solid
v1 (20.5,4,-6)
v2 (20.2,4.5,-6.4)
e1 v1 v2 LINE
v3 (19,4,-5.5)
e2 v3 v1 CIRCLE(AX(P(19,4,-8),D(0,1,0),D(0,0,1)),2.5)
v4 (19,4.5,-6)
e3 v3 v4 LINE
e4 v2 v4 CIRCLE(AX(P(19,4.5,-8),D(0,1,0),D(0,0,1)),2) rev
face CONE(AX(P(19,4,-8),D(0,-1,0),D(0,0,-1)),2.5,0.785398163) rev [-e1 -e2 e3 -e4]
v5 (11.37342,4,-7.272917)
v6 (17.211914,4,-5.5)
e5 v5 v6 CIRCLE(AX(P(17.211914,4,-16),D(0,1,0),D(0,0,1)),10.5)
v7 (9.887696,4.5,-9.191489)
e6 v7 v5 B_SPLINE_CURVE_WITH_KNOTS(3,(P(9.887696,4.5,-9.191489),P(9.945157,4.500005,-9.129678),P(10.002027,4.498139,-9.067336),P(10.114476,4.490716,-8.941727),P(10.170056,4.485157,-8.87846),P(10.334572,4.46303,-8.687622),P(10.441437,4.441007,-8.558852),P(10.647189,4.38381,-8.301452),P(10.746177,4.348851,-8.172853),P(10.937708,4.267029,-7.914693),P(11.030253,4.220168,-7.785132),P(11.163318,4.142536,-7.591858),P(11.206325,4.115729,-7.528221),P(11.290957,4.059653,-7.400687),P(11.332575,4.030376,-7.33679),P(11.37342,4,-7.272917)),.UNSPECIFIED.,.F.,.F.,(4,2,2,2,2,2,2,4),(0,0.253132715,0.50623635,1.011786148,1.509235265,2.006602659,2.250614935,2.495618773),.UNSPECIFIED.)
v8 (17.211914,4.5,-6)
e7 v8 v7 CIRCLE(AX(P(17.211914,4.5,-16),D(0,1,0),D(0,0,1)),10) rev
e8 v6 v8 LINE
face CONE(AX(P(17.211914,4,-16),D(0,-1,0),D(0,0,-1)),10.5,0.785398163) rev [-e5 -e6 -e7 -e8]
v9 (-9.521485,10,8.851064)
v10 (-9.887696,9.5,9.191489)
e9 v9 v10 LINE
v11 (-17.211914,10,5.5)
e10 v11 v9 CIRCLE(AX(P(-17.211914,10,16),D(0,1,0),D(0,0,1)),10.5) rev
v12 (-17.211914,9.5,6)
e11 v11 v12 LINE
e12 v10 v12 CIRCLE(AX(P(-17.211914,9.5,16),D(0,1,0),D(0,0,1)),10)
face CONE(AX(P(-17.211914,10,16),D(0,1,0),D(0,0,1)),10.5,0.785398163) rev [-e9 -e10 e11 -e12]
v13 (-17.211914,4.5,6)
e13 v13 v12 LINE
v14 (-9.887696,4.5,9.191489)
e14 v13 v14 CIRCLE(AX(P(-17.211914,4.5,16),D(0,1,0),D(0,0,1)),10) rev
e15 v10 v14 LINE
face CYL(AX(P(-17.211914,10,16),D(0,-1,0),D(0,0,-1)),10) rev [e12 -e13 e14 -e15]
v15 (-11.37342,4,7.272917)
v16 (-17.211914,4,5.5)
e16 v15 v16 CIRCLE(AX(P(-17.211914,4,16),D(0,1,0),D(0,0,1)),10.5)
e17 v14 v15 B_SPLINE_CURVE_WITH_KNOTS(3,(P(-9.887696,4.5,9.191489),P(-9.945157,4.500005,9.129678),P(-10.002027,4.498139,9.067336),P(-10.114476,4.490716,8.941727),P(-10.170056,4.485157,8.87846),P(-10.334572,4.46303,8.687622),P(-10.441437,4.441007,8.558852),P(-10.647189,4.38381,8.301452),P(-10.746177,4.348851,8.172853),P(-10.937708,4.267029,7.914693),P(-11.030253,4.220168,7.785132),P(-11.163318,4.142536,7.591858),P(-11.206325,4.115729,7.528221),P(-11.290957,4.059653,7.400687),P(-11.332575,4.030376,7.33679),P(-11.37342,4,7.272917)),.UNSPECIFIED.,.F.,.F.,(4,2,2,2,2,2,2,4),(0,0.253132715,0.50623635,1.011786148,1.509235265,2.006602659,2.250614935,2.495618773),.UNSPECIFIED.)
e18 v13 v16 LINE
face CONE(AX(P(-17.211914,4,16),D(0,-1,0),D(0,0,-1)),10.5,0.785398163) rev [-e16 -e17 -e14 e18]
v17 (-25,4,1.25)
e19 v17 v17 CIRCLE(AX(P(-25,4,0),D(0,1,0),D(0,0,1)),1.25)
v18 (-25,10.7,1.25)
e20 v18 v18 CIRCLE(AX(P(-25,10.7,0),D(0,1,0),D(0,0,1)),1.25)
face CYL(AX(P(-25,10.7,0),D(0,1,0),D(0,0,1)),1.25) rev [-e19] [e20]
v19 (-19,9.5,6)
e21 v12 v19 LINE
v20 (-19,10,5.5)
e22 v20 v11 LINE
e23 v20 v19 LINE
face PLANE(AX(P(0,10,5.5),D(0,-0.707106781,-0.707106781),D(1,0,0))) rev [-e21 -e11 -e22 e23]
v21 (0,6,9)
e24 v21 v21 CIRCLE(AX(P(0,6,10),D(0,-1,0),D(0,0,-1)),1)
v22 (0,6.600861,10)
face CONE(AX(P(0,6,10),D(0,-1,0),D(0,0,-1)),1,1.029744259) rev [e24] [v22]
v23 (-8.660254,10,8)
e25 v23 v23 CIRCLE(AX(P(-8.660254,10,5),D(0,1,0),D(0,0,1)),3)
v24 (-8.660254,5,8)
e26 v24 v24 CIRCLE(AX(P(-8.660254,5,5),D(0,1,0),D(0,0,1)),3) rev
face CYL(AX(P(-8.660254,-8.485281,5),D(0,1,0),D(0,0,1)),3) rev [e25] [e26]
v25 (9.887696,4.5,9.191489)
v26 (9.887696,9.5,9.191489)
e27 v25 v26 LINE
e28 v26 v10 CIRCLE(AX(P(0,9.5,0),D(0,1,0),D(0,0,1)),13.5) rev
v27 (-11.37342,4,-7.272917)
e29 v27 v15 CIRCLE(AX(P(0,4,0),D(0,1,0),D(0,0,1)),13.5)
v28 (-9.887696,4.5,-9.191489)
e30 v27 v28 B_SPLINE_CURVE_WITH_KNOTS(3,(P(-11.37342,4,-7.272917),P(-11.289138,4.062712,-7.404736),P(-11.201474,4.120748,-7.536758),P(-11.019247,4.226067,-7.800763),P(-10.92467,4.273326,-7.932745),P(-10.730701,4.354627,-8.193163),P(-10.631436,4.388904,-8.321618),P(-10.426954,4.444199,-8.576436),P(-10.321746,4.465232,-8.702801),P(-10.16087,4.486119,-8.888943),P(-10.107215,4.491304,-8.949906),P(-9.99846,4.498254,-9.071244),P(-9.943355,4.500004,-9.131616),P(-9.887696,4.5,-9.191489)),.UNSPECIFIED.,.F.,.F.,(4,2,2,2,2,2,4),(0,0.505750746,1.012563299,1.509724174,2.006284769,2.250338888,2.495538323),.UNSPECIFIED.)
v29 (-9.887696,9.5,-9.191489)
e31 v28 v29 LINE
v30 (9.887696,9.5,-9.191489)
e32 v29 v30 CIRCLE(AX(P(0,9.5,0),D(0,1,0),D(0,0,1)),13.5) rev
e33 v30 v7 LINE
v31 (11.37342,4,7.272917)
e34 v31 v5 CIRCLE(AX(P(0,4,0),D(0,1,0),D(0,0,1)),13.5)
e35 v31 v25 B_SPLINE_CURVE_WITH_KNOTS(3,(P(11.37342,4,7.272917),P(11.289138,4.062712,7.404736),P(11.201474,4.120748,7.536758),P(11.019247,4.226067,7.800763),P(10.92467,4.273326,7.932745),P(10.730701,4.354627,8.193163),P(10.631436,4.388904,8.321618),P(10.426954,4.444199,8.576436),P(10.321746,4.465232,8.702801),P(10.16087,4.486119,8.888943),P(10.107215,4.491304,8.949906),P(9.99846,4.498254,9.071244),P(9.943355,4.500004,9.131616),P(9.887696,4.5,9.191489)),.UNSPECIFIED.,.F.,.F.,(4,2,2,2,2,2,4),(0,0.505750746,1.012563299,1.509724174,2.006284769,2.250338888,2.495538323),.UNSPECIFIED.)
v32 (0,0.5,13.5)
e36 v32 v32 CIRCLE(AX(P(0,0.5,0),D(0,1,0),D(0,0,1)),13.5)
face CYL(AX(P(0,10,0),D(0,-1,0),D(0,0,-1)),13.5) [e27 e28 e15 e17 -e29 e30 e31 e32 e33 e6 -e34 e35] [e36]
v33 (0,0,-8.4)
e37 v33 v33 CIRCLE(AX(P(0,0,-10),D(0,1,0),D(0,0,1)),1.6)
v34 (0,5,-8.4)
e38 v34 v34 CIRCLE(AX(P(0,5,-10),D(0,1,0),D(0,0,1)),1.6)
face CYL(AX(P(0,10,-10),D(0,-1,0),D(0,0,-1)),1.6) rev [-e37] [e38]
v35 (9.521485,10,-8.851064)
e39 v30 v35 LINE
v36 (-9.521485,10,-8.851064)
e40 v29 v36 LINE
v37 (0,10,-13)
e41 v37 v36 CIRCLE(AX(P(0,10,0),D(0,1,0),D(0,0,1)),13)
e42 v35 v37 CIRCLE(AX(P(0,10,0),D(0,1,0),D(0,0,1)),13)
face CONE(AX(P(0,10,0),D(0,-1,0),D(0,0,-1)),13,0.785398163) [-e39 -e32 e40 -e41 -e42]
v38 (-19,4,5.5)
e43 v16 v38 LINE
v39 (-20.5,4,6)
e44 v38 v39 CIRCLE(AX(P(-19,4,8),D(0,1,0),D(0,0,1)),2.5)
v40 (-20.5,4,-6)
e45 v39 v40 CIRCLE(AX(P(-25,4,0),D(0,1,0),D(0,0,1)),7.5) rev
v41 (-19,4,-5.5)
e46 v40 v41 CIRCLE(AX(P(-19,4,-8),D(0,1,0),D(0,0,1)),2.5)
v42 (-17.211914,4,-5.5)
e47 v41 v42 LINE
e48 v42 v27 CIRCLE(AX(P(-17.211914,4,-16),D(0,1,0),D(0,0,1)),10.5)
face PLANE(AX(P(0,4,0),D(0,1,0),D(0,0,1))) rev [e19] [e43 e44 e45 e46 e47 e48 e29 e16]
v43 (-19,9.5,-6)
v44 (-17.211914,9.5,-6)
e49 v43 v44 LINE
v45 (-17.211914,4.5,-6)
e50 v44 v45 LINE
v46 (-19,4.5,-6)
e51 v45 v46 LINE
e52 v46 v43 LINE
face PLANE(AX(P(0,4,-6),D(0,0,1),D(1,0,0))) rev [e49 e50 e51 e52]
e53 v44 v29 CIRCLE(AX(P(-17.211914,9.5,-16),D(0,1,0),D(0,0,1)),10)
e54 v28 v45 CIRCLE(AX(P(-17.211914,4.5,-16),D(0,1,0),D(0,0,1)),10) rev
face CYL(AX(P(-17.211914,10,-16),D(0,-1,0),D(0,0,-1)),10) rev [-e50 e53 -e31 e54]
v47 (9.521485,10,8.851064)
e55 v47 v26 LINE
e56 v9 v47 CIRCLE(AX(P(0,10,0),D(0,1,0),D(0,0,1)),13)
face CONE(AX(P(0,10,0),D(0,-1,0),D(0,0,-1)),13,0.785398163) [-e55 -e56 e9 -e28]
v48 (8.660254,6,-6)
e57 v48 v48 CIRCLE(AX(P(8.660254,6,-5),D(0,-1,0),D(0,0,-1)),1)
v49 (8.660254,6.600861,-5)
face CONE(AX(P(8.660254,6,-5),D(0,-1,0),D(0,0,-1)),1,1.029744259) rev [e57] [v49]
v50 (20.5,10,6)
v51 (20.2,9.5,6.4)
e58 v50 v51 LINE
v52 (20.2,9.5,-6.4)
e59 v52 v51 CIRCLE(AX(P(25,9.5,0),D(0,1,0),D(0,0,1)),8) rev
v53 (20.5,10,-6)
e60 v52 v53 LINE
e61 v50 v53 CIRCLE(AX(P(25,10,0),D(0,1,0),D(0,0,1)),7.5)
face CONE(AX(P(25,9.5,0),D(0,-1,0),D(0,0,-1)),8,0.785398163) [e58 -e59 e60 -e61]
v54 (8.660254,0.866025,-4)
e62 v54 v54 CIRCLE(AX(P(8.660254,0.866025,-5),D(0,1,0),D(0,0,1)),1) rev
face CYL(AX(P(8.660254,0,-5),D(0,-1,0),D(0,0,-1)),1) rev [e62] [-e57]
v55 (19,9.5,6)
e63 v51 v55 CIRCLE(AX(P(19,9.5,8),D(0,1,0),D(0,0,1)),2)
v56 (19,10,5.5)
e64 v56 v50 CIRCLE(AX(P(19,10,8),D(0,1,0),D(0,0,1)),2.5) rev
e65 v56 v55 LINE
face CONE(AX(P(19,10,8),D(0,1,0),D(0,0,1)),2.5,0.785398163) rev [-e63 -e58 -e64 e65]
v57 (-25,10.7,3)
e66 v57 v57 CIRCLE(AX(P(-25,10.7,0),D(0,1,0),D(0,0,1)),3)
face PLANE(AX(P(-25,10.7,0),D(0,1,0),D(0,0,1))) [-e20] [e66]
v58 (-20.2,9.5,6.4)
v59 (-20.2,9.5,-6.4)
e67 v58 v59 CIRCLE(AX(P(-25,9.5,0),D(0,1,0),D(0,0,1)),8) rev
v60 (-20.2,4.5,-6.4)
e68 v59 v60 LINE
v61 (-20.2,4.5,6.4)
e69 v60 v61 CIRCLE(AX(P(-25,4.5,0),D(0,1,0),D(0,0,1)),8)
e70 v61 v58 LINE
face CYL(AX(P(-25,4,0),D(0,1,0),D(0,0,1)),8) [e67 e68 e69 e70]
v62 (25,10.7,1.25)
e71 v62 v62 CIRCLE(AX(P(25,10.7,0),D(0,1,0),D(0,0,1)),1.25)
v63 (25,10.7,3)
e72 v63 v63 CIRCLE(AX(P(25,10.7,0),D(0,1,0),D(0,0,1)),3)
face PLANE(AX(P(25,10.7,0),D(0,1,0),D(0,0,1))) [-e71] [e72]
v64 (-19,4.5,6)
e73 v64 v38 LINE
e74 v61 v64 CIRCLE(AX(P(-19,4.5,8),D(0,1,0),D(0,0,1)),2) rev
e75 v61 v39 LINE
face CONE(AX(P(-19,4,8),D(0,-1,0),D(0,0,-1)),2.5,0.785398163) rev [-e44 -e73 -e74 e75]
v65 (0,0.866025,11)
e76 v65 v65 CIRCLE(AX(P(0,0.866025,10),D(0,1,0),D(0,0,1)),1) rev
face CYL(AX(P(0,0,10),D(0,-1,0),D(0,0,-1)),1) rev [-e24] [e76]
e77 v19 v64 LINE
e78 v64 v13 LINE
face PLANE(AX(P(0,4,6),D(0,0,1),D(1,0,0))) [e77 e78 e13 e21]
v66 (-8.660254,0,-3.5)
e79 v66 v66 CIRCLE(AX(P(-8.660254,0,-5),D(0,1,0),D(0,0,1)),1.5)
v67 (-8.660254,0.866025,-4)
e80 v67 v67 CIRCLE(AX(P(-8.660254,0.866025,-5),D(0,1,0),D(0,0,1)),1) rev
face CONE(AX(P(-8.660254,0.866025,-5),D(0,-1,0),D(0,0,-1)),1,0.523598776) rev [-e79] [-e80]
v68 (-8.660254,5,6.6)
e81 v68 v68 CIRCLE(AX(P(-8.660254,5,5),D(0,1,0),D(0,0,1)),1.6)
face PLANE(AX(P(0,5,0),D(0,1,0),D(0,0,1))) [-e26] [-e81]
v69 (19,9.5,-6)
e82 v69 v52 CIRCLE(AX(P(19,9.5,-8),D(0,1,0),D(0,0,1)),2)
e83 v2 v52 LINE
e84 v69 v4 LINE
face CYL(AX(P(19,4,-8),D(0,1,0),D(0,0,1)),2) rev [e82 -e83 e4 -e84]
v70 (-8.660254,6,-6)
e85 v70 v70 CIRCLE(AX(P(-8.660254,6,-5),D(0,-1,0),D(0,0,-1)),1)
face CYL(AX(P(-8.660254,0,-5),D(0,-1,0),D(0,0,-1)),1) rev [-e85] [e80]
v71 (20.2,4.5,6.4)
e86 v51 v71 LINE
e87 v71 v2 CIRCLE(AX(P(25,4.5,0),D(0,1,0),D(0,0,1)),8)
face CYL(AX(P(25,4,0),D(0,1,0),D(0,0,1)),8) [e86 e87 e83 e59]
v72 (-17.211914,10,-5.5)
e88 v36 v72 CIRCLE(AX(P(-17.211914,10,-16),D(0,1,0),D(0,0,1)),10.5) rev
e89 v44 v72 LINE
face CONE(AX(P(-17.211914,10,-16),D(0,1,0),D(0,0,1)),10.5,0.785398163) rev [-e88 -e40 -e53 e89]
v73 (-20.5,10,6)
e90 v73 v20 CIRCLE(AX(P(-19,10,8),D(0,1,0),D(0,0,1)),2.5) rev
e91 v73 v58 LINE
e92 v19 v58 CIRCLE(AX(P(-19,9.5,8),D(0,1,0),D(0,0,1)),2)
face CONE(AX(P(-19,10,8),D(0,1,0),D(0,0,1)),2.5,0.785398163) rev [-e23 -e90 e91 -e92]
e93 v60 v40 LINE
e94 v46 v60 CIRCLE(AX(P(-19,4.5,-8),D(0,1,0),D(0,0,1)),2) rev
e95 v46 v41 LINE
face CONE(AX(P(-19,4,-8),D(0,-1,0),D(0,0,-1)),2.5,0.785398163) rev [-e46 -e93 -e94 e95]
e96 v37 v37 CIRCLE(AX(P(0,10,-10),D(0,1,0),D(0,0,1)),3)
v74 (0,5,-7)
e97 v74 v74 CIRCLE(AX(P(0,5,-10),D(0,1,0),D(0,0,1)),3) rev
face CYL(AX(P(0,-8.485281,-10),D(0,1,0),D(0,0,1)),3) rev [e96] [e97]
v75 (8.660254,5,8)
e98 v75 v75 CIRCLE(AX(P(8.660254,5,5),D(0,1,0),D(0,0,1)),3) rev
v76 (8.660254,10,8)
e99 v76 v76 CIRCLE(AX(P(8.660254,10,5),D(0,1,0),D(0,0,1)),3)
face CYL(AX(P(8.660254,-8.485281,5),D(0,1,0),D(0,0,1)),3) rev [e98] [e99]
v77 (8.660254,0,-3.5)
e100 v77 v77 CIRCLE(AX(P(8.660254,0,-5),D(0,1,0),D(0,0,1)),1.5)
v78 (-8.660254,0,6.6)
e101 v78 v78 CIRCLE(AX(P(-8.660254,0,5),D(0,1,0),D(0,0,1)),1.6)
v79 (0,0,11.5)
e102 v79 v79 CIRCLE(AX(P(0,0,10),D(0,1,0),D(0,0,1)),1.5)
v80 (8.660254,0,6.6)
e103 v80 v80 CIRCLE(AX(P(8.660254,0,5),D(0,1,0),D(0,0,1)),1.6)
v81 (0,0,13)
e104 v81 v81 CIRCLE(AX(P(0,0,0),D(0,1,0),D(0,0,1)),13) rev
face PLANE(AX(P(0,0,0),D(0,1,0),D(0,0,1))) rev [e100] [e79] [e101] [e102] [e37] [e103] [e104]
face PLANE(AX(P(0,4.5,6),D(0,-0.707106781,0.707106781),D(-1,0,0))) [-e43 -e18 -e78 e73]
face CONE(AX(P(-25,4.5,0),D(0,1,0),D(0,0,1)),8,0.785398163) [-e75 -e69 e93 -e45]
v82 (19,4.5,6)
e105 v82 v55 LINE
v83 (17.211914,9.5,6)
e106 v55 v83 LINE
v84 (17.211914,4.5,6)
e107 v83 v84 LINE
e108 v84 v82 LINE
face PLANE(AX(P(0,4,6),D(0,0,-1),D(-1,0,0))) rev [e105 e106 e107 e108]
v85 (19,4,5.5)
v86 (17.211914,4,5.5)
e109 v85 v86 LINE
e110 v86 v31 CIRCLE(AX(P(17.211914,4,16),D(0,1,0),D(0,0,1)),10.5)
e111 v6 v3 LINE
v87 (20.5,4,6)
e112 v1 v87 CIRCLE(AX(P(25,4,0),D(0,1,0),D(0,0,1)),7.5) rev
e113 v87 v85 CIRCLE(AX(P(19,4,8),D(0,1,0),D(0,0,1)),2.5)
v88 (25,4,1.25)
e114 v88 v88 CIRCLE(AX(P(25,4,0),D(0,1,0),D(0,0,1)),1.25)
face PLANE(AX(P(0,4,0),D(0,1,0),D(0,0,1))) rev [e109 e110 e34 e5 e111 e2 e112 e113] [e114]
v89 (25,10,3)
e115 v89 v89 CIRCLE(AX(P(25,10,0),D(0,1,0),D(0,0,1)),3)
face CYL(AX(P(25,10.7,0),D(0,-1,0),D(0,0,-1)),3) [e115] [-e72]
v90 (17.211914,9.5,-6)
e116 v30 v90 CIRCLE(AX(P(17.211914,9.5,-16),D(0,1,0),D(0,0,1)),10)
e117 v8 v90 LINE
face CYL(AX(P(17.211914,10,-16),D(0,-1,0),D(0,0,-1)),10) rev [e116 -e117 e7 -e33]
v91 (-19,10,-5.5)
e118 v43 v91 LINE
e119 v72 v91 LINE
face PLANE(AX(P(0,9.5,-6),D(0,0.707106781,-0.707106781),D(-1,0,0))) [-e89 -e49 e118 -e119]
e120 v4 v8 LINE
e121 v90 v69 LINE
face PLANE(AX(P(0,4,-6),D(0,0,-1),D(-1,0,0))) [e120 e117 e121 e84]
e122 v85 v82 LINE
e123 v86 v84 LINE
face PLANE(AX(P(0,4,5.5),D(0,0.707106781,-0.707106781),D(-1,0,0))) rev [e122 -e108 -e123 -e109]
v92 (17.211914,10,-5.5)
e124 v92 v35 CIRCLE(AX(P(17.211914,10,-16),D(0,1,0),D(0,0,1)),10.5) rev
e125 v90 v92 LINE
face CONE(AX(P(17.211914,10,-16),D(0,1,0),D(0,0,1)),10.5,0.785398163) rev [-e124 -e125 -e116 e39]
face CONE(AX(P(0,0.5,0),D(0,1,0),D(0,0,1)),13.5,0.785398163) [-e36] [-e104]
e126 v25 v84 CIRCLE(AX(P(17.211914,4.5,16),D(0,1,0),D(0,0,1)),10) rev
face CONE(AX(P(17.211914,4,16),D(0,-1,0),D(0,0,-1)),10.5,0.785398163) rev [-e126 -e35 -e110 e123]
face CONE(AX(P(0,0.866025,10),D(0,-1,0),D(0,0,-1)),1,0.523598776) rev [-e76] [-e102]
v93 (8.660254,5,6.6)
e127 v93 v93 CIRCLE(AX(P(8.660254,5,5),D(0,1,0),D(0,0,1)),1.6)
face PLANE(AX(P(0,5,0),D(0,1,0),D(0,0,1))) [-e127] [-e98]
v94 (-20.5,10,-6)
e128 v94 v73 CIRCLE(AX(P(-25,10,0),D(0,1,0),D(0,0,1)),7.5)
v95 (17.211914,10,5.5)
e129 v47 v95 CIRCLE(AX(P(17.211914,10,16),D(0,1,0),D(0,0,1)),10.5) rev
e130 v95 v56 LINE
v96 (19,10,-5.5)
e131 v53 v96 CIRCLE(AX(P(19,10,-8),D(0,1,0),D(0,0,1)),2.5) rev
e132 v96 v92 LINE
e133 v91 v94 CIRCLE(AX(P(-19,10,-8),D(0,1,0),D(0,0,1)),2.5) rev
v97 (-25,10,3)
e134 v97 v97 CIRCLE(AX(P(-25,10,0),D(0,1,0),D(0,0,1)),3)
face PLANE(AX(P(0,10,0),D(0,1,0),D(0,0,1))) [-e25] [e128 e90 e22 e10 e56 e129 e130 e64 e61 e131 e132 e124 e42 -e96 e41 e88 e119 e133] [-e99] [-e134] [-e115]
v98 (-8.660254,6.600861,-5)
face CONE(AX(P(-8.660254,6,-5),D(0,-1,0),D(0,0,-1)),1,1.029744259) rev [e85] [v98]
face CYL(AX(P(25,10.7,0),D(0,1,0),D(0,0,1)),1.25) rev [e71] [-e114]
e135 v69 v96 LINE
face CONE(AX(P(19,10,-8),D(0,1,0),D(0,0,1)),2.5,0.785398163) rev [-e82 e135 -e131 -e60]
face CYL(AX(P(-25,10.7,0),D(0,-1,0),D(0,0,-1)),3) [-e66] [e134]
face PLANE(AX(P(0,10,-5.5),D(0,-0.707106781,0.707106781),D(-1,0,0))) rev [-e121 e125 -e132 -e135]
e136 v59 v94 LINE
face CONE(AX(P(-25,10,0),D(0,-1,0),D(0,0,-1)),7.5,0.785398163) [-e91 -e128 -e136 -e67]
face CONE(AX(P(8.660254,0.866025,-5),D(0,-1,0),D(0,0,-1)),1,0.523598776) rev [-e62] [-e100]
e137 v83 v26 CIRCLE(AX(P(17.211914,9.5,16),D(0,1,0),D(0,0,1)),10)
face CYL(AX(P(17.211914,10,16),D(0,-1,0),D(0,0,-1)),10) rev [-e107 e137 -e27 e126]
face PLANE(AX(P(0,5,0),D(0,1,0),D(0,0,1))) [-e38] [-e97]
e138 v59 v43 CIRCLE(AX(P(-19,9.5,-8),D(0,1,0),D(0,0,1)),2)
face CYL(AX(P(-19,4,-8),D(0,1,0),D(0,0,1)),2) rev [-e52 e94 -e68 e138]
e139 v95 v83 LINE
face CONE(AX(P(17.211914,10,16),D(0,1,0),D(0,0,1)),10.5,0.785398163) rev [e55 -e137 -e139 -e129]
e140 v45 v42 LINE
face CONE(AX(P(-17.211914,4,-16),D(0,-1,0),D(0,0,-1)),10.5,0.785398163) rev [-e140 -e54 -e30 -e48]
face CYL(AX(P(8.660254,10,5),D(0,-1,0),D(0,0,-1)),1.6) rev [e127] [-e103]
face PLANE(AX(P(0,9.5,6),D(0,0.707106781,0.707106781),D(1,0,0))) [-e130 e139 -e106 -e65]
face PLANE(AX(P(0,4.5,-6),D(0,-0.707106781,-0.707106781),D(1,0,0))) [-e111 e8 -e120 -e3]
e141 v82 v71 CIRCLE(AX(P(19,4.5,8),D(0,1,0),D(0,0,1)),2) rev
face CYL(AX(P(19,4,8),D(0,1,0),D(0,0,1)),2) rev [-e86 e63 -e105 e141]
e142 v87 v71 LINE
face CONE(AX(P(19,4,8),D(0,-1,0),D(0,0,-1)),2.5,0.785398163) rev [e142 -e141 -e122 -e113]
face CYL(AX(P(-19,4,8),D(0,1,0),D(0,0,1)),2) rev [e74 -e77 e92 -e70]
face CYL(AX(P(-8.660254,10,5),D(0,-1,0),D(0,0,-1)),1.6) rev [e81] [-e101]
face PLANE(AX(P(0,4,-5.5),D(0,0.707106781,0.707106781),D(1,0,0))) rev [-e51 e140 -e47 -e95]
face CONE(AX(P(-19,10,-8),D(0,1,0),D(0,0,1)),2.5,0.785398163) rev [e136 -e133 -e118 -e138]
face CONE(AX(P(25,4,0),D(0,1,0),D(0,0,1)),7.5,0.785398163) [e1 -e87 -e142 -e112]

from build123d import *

# Parameters (mm, degrees)
SKETCH_1_R          = 13.5
SKETCH_1_R_2        = 1.6
EXTRUDE_1_DEPTH     = 10
EXTRUDE_START       = -6
SKETCH_2_R          = 1
EXTRUDE_2_DEPTH     = 6
SKETCH_3_R          = 3
CUT_EXTRUDE_1_DEPTH = 5
SKETCH_4_R          = 3
SKETCH_4_R_2        = 1
EXTRUDE_3_DEPTH     = 0.7
FILLET_1_R          = 10
FILLET_2_R          = 2
HOLE_WIZARD_M3_1_D  = 2.5
F_2_0MM_2_D         = 2
F_2_0MM_2_DEPTH     = 6
F_2_0MM_2_TIP       = 0.600860619
CHAMFER_1_SIZE      = 0.5
CHAMFER_2_SIZE      = 0.5
CHAMFER_2_SIZE2     = 0.866025404


with BuildPart() as part:
    # 草图1 → 凸台-拉伸1 (new body)
    with BuildSketch(Plane(origin=(0, 0, 0), x_dir=(1, 0, 0), z_dir=(0, 1, 0))):
        with Locations(Location((0, 0, 0), (0, 0, 270))):
            Circle(SKETCH_1_R)
        with Locations(Location((0, 10, 0), (0, 0, 270))):
            Circle(SKETCH_1_R_2, mode=Mode.SUBTRACT)
        with Locations(Location((8.660254038, -5, 0), (0, 0, 270))):
            Circle(SKETCH_1_R_2, mode=Mode.SUBTRACT)
        with Locations(Location((-8.660254038, -5, 0), (0, 0, 270))):
            Circle(SKETCH_1_R_2, mode=Mode.SUBTRACT)
    extrude(amount=EXTRUDE_1_DEPTH)

    # 草图2 → 凸台-拉伸2 (add)
    # profile 1 of 2: a face of its own
    with BuildSketch(Plane(origin=(0, 10, 0), x_dir=(1, 0, 0), z_dir=(0, 1, 0)).offset(EXTRUDE_START)):
        with BuildLine():
            Line((-12.093386622, 6), (-19.708497378, 6))
            ThreePointArc((-19.708497378, 6), (-33, 0), (-19.708497378, -6))
            Line((-19.708497378, -6), (-12.093386622, -6))
            ThreePointArc((-12.093386622, -6), (-13.5, 0), (-12.093386622, 6))
        make_face()
        with Locations(Location((-25, 0, 0), (0, 0, 270))):
            Circle(SKETCH_2_R, mode=Mode.SUBTRACT)
    # profile 2 of 2: a face of its own
    with BuildSketch(Plane(origin=(0, 10, 0), x_dir=(1, 0, 0), z_dir=(0, 1, 0)).offset(EXTRUDE_START)):
        with BuildLine():
            ThreePointArc((13.5, 0), (13.143643319, -3.08133742), (12.093386622, -6))
            Line((12.093386622, -6), (19.708497378, -6))
            ThreePointArc((19.708497378, -6), (33, 0), (19.708497378, 6))
            Line((19.708497378, 6), (12.093386622, 6))
            ThreePointArc((12.093386622, 6), (13.143643319, 3.08133742), (13.5, 0))
        make_face()
        with Locations(Location((25, 0, 0), (0, 0, 270))):
            Circle(SKETCH_2_R, mode=Mode.SUBTRACT)
    extrude(amount=EXTRUDE_2_DEPTH)

    # 草图3 → 切除-拉伸1 (cut)
    with BuildSketch(Plane(origin=(0, 10, 0), x_dir=(1, 0, 0), z_dir=(0, 1, 0))):
        with Locations(Location((0, 10, 0), (0, 0, 270))):
            Circle(SKETCH_3_R)
        with Locations(Location((8.660254038, -5, 0), (0, 0, 270))):
            Circle(SKETCH_3_R)
        with Locations(Location((-8.660254038, -5, 0), (0, 0, 270))):
            Circle(SKETCH_3_R)
    extrude(amount=-CUT_EXTRUDE_1_DEPTH, mode=Mode.SUBTRACT)

    # 草图4 → 凸台-拉伸3 (add)
    # profile 1 of 2: a face of its own
    with BuildSketch(Plane(origin=(0, 10, 0), x_dir=(1, 0, 0), z_dir=(0, 1, 0))):
        with Locations(Location((-25, 0, 0), (0, 0, 270))):
            Circle(SKETCH_4_R)
        with Locations(Location((-25, 0, 0), (0, 0, 270))):
            Circle(SKETCH_4_R_2, mode=Mode.SUBTRACT)
    # profile 2 of 2: a face of its own
    with BuildSketch(Plane(origin=(0, 10, 0), x_dir=(1, 0, 0), z_dir=(0, 1, 0))):
        with Locations(Location((25, 0, 0), (0, 0, 270))):
            Circle(SKETCH_4_R)
        with Locations(Location((25, 0, 0), (0, 0, 270))):
            Circle(SKETCH_4_R_2, mode=Mode.SUBTRACT)
    extrude(amount=EXTRUDE_3_DEPTH)

    # 圆角1
    fillet_1_edges = [part.edges().sort_by_distance(p)[0] for p in [
        (-12.093386622, 7, -6),
        (-12.093386622, 7, 6),
        (12.093386622, 7, 6),
        (12.093386622, 7, -6),
    ]]
    fillet(fillet_1_edges, radius=FILLET_1_R)

    # 圆角2
    fillet_2_edges = [part.edges().sort_by_distance(p)[0] for p in [
        (-19.708497378, 7, -6),
        (-19.708497378, 7, 6),
        (19.708497378, 7, -6),
        (19.708497378, 7, 6),
    ]]
    fillet(fillet_2_edges, radius=FILLET_2_R)

    # M3 螺纹孔1 (through all)
    with Locations(Plane(origin=(0, 10.7, 0), x_dir=(1, 0, 0), z_dir=(0, 1, 0))):
        with Locations((-25, 0), (25, 0)):
            Hole(HOLE_WIZARD_M3_1_D / 2)

    # Ø2.0mm 暗销孔2
    with Locations(Plane.XZ):
        with Locations((-8.660254038, -5), (0, 10), (8.660254038, -5)):
            Hole(F_2_0MM_2_D / 2, depth=F_2_0MM_2_DEPTH)
            with Locations((0, 0, -(F_2_0MM_2_DEPTH + F_2_0MM_2_TIP / 2))):  # 118° drill point
                Cone(0, F_2_0MM_2_D / 2, F_2_0MM_2_TIP, mode=Mode.SUBTRACT)

    # 倒角1
    # the kernel refuses this chamfer: 0.5 mm, written as the material it takes off along each edge
    with BuildSketch(Plane(origin=(25, 10, 0), x_dir=(-0.5999999999999984, 0, 0.8000000000000012), z_dir=(-0.8000000000000012, 0, -0.5999999999999984))) as chamfer_1_piece_1:
        Polygon((8 - CHAMFER_1_SIZE, 0), (8, -CHAMFER_1_SIZE), (8, 0), align=None)
    revolve(axis=Axis((25, 10, 0), (0, 1, 0)), revolution_arc=253.739795292, mode=Mode.SUBTRACT)
    with BuildSketch(Plane(origin=(25, 4, 0), x_dir=(-0.5999999999999984, 0, 0.8000000000000012), z_dir=(-0.8000000000000012, 0, -0.5999999999999984))) as chamfer_1_piece_2:
        Polygon((8, CHAMFER_1_SIZE), (8 - CHAMFER_1_SIZE, 0), (8, 0), align=None)
    revolve(axis=Axis((25, 4, 0), (0, 1, 0)), revolution_arc=253.739795292, mode=Mode.SUBTRACT)
    with BuildSketch(Plane(origin=(19, 4, -6), x_dir=(0, 0.9996219169112968, -0.027495876610585647), z_dir=(-1, 0, 0)), Plane(origin=(19, 10, -6), x_dir=(0, 0.027495876610585647, 0.9996219169112968), z_dir=(-1, 0, 0)), Plane(origin=(17.211914478, 10, 6), x_dir=(0, 0.027495876610585647, -0.9996219169112968), z_dir=(1, 0, 0)), Plane(origin=(17.211914478, 4, 6), x_dir=(0, 0.9996219169112968, 0.027495876610585647), z_dir=(1, 0, 0)), Plane(origin=(-17.211914478, 10, -6), x_dir=(0, 0.027495876610585647, 0.9996219169112968), z_dir=(-1, 0, 0)), Plane(origin=(-19, 4, 6), x_dir=(0, 0.9996219169112968, 0.027495876610585647), z_dir=(1, 0, 0))) as chamfer_1_piece_3:
        Polygon((CHAMFER_1_SIZE * 0.999621916911, -CHAMFER_1_SIZE * 0.0274958766106), (-CHAMFER_1_SIZE * 0.0274958766106, -CHAMFER_1_SIZE * 0.999621916911), (0, 0), align=None)
    extrude(amount=1.788085522, mode=Mode.SUBTRACT)
    with BuildSketch(Plane(origin=(-17.211914478, 4, -6), x_dir=(0, -0.02749587661058651, 0.9996219169112968), z_dir=(-1, 0, 0)), Plane(origin=(-19, 10, 6), x_dir=(0, -0.9996219169112968, 0.027495876610585647), z_dir=(1, 0, 0))) as chamfer_1_piece_4:
        Polygon((CHAMFER_1_SIZE * 0.999621916911, CHAMFER_1_SIZE * 0.0274958766106), (-CHAMFER_1_SIZE * 0.0274958766106, CHAMFER_1_SIZE * 0.999621916911), (0, 0), align=None)
    extrude(amount=1.788085522, mode=Mode.SUBTRACT)
    with BuildSketch(Plane(origin=(-25, 10, 0), x_dir=(0.5999999999999998, 0, -0.8000000000000003), z_dir=(0.8000000000000003, 0, 0.5999999999999998))) as chamfer_1_piece_5:
        Polygon((8 - CHAMFER_1_SIZE, 0), (8, -CHAMFER_1_SIZE), (8, 0), align=None)
    revolve(axis=Axis((-25, 10, 0), (0, 1, 0)), revolution_arc=253.739795292, mode=Mode.SUBTRACT)
    with BuildSketch(Plane(origin=(-25, 4, 0), x_dir=(0.5999999999999998, 0, -0.8000000000000003), z_dir=(0.8000000000000003, 0, 0.5999999999999998))) as chamfer_1_piece_6:
        Polygon((8 - CHAMFER_1_SIZE, 0), (8, CHAMFER_1_SIZE), (8, 0), align=None)
    revolve(axis=Axis((-25, 4, 0), (0, 1, 0)), revolution_arc=253.739795292, mode=Mode.SUBTRACT)
    with BuildSketch(Plane(origin=(19, 10, -8), x_dir=(0, 0, 1), z_dir=(-1, 0, 0))) as chamfer_1_piece_7:
        Polygon((2 + CHAMFER_1_SIZE, 0), (2, -CHAMFER_1_SIZE), (2, 0), align=None)
    revolve(axis=Axis((19, 10, -8), (0, 1, 0)), revolution_arc=36.869897646, mode=Mode.SUBTRACT)
    with BuildSketch(Plane(origin=(19, 4, -8), x_dir=(0, 0, 1), z_dir=(-1, 0, 0))) as chamfer_1_piece_8:
        Polygon((2, CHAMFER_1_SIZE), (2 + CHAMFER_1_SIZE, 0), (2, 0), align=None)
    revolve(axis=Axis((19, 4, -8), (0, 1, 0)), revolution_arc=36.869897646, mode=Mode.SUBTRACT)
    with BuildSketch(Plane(origin=(19, 10, 8), x_dir=(0.5999999999999981, 0, -0.8000000000000014), z_dir=(0.8000000000000014, 0, 0.5999999999999981))) as chamfer_1_piece_9:
        Polygon((2 + CHAMFER_1_SIZE, 0), (2, -CHAMFER_1_SIZE), (2, 0), align=None)
    revolve(axis=Axis((19, 10, 8), (0, 1, 0)), revolution_arc=36.869897646, mode=Mode.SUBTRACT)
    with BuildSketch(Plane(origin=(19, 4, 8), x_dir=(0.5999999999999981, 0, -0.8000000000000014), z_dir=(0.8000000000000014, 0, 0.5999999999999981))) as chamfer_1_piece_10:
        Polygon((2, CHAMFER_1_SIZE), (2 + CHAMFER_1_SIZE, 0), (2, 0), align=None)
    revolve(axis=Axis((19, 4, 8), (0, 1, 0)), revolution_arc=36.869897646, mode=Mode.SUBTRACT)
    with BuildSketch(Plane(origin=(-19, 10, -8), x_dir=(-0.5999999999999999, 0, 0.8), z_dir=(-0.8, 0, -0.5999999999999999))) as chamfer_1_piece_11:
        Polygon((2 + CHAMFER_1_SIZE, 0), (2, -CHAMFER_1_SIZE), (2, 0), align=None)
    revolve(axis=Axis((-19, 10, -8), (0, 1, 0)), revolution_arc=36.869897646, mode=Mode.SUBTRACT)
    with BuildSketch(Plane(origin=(-19, 4, -8), x_dir=(-0.5999999999999999, 0, 0.8), z_dir=(-0.8, 0, -0.5999999999999999))) as chamfer_1_piece_12:
        Polygon((2 + CHAMFER_1_SIZE, 0), (2, CHAMFER_1_SIZE), (2, 0), align=None)
    revolve(axis=Axis((-19, 4, -8), (0, 1, 0)), revolution_arc=36.869897646, mode=Mode.SUBTRACT)
    with BuildSketch(Plane(origin=(-19, 10, 8), x_dir=(0, 0, -1), z_dir=(1, 0, 0))) as chamfer_1_piece_13:
        Polygon((2, -CHAMFER_1_SIZE), (2 + CHAMFER_1_SIZE, 0), (2, 0), align=None)
    revolve(axis=Axis((-19, 10, 8), (0, 1, 0)), revolution_arc=36.869897646, mode=Mode.SUBTRACT)
    with BuildSketch(Plane(origin=(-19, 4, 8), x_dir=(0, 0, -1), z_dir=(1, 0, 0))) as chamfer_1_piece_14:
        Polygon((2 + CHAMFER_1_SIZE, 0), (2, CHAMFER_1_SIZE), (2, 0), align=None)
    revolve(axis=Axis((-19, 4, 8), (0, 1, 0)), revolution_arc=36.869897646, mode=Mode.SUBTRACT)
    with BuildSketch(Plane(origin=(0, 0, 0), x_dir=(0, 0, 1), z_dir=(-1, 0, 0))) as chamfer_1_piece_15:
        Polygon((13.5, CHAMFER_1_SIZE), (13.5 - CHAMFER_1_SIZE, 0), (13.5, 0), align=None)
    revolve(axis=Axis((0, 0, 0), (0, 1, 0)), mode=Mode.SUBTRACT)
    with BuildSketch(Plane(origin=(0, 10, 0), x_dir=(0.7324218926833406, 0, -0.6808510638297873), z_dir=(0.6808510638297873, 0, 0.7324218926833406))) as chamfer_1_piece_16:
        Polygon((13.5 - CHAMFER_1_SIZE, 0), (13.5, -CHAMFER_1_SIZE), (13.5, 0), align=None)
    revolve(axis=Axis((0, 10, 0), (0, 1, 0)), revolution_arc=94.179631957, mode=Mode.SUBTRACT)
    with BuildSketch(Plane(origin=(0, 10, 0), x_dir=(0, 0, 1), z_dir=(-1, 0, 0))) as chamfer_1_piece_17:
        Polygon((13.5 - CHAMFER_1_SIZE, 0), (13.5, -CHAMFER_1_SIZE), (13.5, 0), align=None)
    revolve(axis=Axis((0, 10, 0), (0, 1, 0)), revolution_arc=47.089815978, mode=Mode.SUBTRACT)
    with BuildSketch(Plane(origin=(17.211914478, 10, 16), x_dir=(-0.7324218926833408, 0, -0.6808510638297871), z_dir=(-0.6808510638297871, 0, 0.7324218926833408))) as chamfer_1_piece_18:
        Polygon((10 + CHAMFER_1_SIZE, 0), (10, CHAMFER_1_SIZE), (10, 0), align=None)
    revolve(axis=Axis((17.211914478, 10, 16), (0, -1, 0)), revolution_arc=47.089815978, mode=Mode.SUBTRACT)
    with BuildSketch(Plane(origin=(17.211914478, 4, 16), x_dir=(-0.8136891664340865, 0, -0.5813002154031954), z_dir=(-0.5813002154031954, 0, 0.8136891664340865))) as chamfer_1_piece_19_section:
        Polygon((10, -CHAMFER_1_SIZE), (10 + CHAMFER_1_SIZE, 0), (10, 0), align=None)
    chamfer_1_piece_19 = revolve(axis=Axis((17.211914478, 4, 16), (0, -1, 0)), revolution_arc=54.457955081, mode=Mode.PRIVATE)
    chamfer_1_piece_19 = chamfer_1_piece_19 - Plane(origin=(0, 4.17908791, 0), x_dir=(0, 0, 1), z_dir=(0, -1, 0)) * Cylinder(13.5, 42, mode=Mode.PRIVATE)
    add(chamfer_1_piece_19, mode=Mode.SUBTRACT)
    with BuildSketch(Plane(origin=(17.211914478, 10, -16), x_dir=(-0.732421892683341, 0, 0.680851063829787), z_dir=(-0.680851063829787, 0, -0.732421892683341))) as chamfer_1_piece_20:
        Polygon((10 + CHAMFER_1_SIZE, 0), (10, -CHAMFER_1_SIZE), (10, 0), align=None)
    revolve(axis=Axis((17.211914478, 10, -16), (0, 1, 0)), revolution_arc=47.089815978, mode=Mode.SUBTRACT)
    with BuildSketch(Plane(origin=(17.211914478, 4, -16), x_dir=(-0.8136891664340864, 0, 0.5813002154031957), z_dir=(-0.5813002154031957, 0, -0.8136891664340864))) as chamfer_1_piece_21_section:
        Polygon((10, CHAMFER_1_SIZE), (10 + CHAMFER_1_SIZE, 0), (10, 0), align=None)
    chamfer_1_piece_21 = revolve(axis=Axis((17.211914478, 4, -16), (0, 1, 0)), revolution_arc=54.457955081, mode=Mode.PRIVATE)
    chamfer_1_piece_21 = chamfer_1_piece_21 - Plane(origin=(0, 4.179087906, 0), x_dir=(0, 0, 1), z_dir=(0, -1, 0)) * Cylinder(13.5, 42, mode=Mode.PRIVATE)
    add(chamfer_1_piece_21, mode=Mode.SUBTRACT)
    with BuildSketch(Plane(origin=(-17.211914478, 10, -16), x_dir=(0.732421892683341, 0, 0.680851063829787), z_dir=(0.680851063829787, 0, -0.732421892683341))) as chamfer_1_piece_22:
        Polygon((10 + CHAMFER_1_SIZE, 0), (10, CHAMFER_1_SIZE), (10, 0), align=None)
    revolve(axis=Axis((-17.211914478, 10, -16), (0, -1, 0)), revolution_arc=47.089815978, mode=Mode.SUBTRACT)
    with BuildSketch(Plane(origin=(-17.211914478, 4, -16), x_dir=(0.8136891664340864, 0, 0.5813002154031957), z_dir=(0.5813002154031957, 0, -0.8136891664340864))) as chamfer_1_piece_23_section:
        Polygon((10 + CHAMFER_1_SIZE, 0), (10, -CHAMFER_1_SIZE), (10, 0), align=None)
    chamfer_1_piece_23 = revolve(axis=Axis((-17.211914478, 4, -16), (0, -1, 0)), revolution_arc=54.457955081, mode=Mode.PRIVATE)
    chamfer_1_piece_23 = chamfer_1_piece_23 - Plane(origin=(0, 4.179087909, 0), x_dir=(0, 0, 1), z_dir=(0, -1, 0)) * Cylinder(13.5, 43, mode=Mode.PRIVATE)
    add(chamfer_1_piece_23, mode=Mode.SUBTRACT)
    with BuildSketch(Plane(origin=(-17.211914478, 10, 16), x_dir=(0.7324218926833401, 0, -0.6808510638297878), z_dir=(0.6808510638297878, 0, 0.7324218926833401))) as chamfer_1_piece_24:
        Polygon((10, -CHAMFER_1_SIZE), (10 + CHAMFER_1_SIZE, 0), (10, 0), align=None)
    revolve(axis=Axis((-17.211914478, 10, 16), (0, 1, 0)), revolution_arc=47.089815978, mode=Mode.SUBTRACT)
    with BuildSketch(Plane(origin=(-17.211914478, 4, 16), x_dir=(0.8136891664340858, 0, -0.5813002154031963), z_dir=(0.5813002154031963, 0, 0.8136891664340858))) as chamfer_1_piece_25_section:
        Polygon((10 + CHAMFER_1_SIZE, 0), (10, CHAMFER_1_SIZE), (10, 0), align=None)
    chamfer_1_piece_25 = revolve(axis=Axis((-17.211914478, 4, 16), (0, 1, 0)), revolution_arc=54.457955081, mode=Mode.PRIVATE)
    chamfer_1_piece_25 = chamfer_1_piece_25 - Plane(origin=(0, 4.179087907, 0), x_dir=(0, 0, 1), z_dir=(0, -1, 0)) * Cylinder(13.5, 42, mode=Mode.PRIVATE)
    add(chamfer_1_piece_25, mode=Mode.SUBTRACT)
    with BuildSketch(Plane(origin=(0, 10, 0), x_dir=(-0.732421892683341, 0, 0.6808510638297869), z_dir=(-0.6808510638297869, 0, -0.732421892683341))) as chamfer_1_piece_26:
        Polygon((13.5 - CHAMFER_1_SIZE, 0), (13.5, -CHAMFER_1_SIZE), (13.5, 0), align=None)
    revolve(axis=Axis((0, 10, 0), (0, 1, 0)), revolution_arc=47.089815978, mode=Mode.SUBTRACT)

    # 倒角2
    chamfer_2_edges = [part.edges().sort_by_distance(p)[0] for p in [
        (-7.660254038, 0, -5),
        (9.660254038, 0, -5),
        (1, 0, 10),
    ]]
    chamfer_2_side = [part.faces().sort_by_distance(p)[0] for p in [
        (0, 0, 0),
    ]]
    chamfer(chamfer_2_edges, length=CHAMFER_2_SIZE, length2=CHAMFER_2_SIZE2, reference=chamfer_2_side[0])


solid = part.part
